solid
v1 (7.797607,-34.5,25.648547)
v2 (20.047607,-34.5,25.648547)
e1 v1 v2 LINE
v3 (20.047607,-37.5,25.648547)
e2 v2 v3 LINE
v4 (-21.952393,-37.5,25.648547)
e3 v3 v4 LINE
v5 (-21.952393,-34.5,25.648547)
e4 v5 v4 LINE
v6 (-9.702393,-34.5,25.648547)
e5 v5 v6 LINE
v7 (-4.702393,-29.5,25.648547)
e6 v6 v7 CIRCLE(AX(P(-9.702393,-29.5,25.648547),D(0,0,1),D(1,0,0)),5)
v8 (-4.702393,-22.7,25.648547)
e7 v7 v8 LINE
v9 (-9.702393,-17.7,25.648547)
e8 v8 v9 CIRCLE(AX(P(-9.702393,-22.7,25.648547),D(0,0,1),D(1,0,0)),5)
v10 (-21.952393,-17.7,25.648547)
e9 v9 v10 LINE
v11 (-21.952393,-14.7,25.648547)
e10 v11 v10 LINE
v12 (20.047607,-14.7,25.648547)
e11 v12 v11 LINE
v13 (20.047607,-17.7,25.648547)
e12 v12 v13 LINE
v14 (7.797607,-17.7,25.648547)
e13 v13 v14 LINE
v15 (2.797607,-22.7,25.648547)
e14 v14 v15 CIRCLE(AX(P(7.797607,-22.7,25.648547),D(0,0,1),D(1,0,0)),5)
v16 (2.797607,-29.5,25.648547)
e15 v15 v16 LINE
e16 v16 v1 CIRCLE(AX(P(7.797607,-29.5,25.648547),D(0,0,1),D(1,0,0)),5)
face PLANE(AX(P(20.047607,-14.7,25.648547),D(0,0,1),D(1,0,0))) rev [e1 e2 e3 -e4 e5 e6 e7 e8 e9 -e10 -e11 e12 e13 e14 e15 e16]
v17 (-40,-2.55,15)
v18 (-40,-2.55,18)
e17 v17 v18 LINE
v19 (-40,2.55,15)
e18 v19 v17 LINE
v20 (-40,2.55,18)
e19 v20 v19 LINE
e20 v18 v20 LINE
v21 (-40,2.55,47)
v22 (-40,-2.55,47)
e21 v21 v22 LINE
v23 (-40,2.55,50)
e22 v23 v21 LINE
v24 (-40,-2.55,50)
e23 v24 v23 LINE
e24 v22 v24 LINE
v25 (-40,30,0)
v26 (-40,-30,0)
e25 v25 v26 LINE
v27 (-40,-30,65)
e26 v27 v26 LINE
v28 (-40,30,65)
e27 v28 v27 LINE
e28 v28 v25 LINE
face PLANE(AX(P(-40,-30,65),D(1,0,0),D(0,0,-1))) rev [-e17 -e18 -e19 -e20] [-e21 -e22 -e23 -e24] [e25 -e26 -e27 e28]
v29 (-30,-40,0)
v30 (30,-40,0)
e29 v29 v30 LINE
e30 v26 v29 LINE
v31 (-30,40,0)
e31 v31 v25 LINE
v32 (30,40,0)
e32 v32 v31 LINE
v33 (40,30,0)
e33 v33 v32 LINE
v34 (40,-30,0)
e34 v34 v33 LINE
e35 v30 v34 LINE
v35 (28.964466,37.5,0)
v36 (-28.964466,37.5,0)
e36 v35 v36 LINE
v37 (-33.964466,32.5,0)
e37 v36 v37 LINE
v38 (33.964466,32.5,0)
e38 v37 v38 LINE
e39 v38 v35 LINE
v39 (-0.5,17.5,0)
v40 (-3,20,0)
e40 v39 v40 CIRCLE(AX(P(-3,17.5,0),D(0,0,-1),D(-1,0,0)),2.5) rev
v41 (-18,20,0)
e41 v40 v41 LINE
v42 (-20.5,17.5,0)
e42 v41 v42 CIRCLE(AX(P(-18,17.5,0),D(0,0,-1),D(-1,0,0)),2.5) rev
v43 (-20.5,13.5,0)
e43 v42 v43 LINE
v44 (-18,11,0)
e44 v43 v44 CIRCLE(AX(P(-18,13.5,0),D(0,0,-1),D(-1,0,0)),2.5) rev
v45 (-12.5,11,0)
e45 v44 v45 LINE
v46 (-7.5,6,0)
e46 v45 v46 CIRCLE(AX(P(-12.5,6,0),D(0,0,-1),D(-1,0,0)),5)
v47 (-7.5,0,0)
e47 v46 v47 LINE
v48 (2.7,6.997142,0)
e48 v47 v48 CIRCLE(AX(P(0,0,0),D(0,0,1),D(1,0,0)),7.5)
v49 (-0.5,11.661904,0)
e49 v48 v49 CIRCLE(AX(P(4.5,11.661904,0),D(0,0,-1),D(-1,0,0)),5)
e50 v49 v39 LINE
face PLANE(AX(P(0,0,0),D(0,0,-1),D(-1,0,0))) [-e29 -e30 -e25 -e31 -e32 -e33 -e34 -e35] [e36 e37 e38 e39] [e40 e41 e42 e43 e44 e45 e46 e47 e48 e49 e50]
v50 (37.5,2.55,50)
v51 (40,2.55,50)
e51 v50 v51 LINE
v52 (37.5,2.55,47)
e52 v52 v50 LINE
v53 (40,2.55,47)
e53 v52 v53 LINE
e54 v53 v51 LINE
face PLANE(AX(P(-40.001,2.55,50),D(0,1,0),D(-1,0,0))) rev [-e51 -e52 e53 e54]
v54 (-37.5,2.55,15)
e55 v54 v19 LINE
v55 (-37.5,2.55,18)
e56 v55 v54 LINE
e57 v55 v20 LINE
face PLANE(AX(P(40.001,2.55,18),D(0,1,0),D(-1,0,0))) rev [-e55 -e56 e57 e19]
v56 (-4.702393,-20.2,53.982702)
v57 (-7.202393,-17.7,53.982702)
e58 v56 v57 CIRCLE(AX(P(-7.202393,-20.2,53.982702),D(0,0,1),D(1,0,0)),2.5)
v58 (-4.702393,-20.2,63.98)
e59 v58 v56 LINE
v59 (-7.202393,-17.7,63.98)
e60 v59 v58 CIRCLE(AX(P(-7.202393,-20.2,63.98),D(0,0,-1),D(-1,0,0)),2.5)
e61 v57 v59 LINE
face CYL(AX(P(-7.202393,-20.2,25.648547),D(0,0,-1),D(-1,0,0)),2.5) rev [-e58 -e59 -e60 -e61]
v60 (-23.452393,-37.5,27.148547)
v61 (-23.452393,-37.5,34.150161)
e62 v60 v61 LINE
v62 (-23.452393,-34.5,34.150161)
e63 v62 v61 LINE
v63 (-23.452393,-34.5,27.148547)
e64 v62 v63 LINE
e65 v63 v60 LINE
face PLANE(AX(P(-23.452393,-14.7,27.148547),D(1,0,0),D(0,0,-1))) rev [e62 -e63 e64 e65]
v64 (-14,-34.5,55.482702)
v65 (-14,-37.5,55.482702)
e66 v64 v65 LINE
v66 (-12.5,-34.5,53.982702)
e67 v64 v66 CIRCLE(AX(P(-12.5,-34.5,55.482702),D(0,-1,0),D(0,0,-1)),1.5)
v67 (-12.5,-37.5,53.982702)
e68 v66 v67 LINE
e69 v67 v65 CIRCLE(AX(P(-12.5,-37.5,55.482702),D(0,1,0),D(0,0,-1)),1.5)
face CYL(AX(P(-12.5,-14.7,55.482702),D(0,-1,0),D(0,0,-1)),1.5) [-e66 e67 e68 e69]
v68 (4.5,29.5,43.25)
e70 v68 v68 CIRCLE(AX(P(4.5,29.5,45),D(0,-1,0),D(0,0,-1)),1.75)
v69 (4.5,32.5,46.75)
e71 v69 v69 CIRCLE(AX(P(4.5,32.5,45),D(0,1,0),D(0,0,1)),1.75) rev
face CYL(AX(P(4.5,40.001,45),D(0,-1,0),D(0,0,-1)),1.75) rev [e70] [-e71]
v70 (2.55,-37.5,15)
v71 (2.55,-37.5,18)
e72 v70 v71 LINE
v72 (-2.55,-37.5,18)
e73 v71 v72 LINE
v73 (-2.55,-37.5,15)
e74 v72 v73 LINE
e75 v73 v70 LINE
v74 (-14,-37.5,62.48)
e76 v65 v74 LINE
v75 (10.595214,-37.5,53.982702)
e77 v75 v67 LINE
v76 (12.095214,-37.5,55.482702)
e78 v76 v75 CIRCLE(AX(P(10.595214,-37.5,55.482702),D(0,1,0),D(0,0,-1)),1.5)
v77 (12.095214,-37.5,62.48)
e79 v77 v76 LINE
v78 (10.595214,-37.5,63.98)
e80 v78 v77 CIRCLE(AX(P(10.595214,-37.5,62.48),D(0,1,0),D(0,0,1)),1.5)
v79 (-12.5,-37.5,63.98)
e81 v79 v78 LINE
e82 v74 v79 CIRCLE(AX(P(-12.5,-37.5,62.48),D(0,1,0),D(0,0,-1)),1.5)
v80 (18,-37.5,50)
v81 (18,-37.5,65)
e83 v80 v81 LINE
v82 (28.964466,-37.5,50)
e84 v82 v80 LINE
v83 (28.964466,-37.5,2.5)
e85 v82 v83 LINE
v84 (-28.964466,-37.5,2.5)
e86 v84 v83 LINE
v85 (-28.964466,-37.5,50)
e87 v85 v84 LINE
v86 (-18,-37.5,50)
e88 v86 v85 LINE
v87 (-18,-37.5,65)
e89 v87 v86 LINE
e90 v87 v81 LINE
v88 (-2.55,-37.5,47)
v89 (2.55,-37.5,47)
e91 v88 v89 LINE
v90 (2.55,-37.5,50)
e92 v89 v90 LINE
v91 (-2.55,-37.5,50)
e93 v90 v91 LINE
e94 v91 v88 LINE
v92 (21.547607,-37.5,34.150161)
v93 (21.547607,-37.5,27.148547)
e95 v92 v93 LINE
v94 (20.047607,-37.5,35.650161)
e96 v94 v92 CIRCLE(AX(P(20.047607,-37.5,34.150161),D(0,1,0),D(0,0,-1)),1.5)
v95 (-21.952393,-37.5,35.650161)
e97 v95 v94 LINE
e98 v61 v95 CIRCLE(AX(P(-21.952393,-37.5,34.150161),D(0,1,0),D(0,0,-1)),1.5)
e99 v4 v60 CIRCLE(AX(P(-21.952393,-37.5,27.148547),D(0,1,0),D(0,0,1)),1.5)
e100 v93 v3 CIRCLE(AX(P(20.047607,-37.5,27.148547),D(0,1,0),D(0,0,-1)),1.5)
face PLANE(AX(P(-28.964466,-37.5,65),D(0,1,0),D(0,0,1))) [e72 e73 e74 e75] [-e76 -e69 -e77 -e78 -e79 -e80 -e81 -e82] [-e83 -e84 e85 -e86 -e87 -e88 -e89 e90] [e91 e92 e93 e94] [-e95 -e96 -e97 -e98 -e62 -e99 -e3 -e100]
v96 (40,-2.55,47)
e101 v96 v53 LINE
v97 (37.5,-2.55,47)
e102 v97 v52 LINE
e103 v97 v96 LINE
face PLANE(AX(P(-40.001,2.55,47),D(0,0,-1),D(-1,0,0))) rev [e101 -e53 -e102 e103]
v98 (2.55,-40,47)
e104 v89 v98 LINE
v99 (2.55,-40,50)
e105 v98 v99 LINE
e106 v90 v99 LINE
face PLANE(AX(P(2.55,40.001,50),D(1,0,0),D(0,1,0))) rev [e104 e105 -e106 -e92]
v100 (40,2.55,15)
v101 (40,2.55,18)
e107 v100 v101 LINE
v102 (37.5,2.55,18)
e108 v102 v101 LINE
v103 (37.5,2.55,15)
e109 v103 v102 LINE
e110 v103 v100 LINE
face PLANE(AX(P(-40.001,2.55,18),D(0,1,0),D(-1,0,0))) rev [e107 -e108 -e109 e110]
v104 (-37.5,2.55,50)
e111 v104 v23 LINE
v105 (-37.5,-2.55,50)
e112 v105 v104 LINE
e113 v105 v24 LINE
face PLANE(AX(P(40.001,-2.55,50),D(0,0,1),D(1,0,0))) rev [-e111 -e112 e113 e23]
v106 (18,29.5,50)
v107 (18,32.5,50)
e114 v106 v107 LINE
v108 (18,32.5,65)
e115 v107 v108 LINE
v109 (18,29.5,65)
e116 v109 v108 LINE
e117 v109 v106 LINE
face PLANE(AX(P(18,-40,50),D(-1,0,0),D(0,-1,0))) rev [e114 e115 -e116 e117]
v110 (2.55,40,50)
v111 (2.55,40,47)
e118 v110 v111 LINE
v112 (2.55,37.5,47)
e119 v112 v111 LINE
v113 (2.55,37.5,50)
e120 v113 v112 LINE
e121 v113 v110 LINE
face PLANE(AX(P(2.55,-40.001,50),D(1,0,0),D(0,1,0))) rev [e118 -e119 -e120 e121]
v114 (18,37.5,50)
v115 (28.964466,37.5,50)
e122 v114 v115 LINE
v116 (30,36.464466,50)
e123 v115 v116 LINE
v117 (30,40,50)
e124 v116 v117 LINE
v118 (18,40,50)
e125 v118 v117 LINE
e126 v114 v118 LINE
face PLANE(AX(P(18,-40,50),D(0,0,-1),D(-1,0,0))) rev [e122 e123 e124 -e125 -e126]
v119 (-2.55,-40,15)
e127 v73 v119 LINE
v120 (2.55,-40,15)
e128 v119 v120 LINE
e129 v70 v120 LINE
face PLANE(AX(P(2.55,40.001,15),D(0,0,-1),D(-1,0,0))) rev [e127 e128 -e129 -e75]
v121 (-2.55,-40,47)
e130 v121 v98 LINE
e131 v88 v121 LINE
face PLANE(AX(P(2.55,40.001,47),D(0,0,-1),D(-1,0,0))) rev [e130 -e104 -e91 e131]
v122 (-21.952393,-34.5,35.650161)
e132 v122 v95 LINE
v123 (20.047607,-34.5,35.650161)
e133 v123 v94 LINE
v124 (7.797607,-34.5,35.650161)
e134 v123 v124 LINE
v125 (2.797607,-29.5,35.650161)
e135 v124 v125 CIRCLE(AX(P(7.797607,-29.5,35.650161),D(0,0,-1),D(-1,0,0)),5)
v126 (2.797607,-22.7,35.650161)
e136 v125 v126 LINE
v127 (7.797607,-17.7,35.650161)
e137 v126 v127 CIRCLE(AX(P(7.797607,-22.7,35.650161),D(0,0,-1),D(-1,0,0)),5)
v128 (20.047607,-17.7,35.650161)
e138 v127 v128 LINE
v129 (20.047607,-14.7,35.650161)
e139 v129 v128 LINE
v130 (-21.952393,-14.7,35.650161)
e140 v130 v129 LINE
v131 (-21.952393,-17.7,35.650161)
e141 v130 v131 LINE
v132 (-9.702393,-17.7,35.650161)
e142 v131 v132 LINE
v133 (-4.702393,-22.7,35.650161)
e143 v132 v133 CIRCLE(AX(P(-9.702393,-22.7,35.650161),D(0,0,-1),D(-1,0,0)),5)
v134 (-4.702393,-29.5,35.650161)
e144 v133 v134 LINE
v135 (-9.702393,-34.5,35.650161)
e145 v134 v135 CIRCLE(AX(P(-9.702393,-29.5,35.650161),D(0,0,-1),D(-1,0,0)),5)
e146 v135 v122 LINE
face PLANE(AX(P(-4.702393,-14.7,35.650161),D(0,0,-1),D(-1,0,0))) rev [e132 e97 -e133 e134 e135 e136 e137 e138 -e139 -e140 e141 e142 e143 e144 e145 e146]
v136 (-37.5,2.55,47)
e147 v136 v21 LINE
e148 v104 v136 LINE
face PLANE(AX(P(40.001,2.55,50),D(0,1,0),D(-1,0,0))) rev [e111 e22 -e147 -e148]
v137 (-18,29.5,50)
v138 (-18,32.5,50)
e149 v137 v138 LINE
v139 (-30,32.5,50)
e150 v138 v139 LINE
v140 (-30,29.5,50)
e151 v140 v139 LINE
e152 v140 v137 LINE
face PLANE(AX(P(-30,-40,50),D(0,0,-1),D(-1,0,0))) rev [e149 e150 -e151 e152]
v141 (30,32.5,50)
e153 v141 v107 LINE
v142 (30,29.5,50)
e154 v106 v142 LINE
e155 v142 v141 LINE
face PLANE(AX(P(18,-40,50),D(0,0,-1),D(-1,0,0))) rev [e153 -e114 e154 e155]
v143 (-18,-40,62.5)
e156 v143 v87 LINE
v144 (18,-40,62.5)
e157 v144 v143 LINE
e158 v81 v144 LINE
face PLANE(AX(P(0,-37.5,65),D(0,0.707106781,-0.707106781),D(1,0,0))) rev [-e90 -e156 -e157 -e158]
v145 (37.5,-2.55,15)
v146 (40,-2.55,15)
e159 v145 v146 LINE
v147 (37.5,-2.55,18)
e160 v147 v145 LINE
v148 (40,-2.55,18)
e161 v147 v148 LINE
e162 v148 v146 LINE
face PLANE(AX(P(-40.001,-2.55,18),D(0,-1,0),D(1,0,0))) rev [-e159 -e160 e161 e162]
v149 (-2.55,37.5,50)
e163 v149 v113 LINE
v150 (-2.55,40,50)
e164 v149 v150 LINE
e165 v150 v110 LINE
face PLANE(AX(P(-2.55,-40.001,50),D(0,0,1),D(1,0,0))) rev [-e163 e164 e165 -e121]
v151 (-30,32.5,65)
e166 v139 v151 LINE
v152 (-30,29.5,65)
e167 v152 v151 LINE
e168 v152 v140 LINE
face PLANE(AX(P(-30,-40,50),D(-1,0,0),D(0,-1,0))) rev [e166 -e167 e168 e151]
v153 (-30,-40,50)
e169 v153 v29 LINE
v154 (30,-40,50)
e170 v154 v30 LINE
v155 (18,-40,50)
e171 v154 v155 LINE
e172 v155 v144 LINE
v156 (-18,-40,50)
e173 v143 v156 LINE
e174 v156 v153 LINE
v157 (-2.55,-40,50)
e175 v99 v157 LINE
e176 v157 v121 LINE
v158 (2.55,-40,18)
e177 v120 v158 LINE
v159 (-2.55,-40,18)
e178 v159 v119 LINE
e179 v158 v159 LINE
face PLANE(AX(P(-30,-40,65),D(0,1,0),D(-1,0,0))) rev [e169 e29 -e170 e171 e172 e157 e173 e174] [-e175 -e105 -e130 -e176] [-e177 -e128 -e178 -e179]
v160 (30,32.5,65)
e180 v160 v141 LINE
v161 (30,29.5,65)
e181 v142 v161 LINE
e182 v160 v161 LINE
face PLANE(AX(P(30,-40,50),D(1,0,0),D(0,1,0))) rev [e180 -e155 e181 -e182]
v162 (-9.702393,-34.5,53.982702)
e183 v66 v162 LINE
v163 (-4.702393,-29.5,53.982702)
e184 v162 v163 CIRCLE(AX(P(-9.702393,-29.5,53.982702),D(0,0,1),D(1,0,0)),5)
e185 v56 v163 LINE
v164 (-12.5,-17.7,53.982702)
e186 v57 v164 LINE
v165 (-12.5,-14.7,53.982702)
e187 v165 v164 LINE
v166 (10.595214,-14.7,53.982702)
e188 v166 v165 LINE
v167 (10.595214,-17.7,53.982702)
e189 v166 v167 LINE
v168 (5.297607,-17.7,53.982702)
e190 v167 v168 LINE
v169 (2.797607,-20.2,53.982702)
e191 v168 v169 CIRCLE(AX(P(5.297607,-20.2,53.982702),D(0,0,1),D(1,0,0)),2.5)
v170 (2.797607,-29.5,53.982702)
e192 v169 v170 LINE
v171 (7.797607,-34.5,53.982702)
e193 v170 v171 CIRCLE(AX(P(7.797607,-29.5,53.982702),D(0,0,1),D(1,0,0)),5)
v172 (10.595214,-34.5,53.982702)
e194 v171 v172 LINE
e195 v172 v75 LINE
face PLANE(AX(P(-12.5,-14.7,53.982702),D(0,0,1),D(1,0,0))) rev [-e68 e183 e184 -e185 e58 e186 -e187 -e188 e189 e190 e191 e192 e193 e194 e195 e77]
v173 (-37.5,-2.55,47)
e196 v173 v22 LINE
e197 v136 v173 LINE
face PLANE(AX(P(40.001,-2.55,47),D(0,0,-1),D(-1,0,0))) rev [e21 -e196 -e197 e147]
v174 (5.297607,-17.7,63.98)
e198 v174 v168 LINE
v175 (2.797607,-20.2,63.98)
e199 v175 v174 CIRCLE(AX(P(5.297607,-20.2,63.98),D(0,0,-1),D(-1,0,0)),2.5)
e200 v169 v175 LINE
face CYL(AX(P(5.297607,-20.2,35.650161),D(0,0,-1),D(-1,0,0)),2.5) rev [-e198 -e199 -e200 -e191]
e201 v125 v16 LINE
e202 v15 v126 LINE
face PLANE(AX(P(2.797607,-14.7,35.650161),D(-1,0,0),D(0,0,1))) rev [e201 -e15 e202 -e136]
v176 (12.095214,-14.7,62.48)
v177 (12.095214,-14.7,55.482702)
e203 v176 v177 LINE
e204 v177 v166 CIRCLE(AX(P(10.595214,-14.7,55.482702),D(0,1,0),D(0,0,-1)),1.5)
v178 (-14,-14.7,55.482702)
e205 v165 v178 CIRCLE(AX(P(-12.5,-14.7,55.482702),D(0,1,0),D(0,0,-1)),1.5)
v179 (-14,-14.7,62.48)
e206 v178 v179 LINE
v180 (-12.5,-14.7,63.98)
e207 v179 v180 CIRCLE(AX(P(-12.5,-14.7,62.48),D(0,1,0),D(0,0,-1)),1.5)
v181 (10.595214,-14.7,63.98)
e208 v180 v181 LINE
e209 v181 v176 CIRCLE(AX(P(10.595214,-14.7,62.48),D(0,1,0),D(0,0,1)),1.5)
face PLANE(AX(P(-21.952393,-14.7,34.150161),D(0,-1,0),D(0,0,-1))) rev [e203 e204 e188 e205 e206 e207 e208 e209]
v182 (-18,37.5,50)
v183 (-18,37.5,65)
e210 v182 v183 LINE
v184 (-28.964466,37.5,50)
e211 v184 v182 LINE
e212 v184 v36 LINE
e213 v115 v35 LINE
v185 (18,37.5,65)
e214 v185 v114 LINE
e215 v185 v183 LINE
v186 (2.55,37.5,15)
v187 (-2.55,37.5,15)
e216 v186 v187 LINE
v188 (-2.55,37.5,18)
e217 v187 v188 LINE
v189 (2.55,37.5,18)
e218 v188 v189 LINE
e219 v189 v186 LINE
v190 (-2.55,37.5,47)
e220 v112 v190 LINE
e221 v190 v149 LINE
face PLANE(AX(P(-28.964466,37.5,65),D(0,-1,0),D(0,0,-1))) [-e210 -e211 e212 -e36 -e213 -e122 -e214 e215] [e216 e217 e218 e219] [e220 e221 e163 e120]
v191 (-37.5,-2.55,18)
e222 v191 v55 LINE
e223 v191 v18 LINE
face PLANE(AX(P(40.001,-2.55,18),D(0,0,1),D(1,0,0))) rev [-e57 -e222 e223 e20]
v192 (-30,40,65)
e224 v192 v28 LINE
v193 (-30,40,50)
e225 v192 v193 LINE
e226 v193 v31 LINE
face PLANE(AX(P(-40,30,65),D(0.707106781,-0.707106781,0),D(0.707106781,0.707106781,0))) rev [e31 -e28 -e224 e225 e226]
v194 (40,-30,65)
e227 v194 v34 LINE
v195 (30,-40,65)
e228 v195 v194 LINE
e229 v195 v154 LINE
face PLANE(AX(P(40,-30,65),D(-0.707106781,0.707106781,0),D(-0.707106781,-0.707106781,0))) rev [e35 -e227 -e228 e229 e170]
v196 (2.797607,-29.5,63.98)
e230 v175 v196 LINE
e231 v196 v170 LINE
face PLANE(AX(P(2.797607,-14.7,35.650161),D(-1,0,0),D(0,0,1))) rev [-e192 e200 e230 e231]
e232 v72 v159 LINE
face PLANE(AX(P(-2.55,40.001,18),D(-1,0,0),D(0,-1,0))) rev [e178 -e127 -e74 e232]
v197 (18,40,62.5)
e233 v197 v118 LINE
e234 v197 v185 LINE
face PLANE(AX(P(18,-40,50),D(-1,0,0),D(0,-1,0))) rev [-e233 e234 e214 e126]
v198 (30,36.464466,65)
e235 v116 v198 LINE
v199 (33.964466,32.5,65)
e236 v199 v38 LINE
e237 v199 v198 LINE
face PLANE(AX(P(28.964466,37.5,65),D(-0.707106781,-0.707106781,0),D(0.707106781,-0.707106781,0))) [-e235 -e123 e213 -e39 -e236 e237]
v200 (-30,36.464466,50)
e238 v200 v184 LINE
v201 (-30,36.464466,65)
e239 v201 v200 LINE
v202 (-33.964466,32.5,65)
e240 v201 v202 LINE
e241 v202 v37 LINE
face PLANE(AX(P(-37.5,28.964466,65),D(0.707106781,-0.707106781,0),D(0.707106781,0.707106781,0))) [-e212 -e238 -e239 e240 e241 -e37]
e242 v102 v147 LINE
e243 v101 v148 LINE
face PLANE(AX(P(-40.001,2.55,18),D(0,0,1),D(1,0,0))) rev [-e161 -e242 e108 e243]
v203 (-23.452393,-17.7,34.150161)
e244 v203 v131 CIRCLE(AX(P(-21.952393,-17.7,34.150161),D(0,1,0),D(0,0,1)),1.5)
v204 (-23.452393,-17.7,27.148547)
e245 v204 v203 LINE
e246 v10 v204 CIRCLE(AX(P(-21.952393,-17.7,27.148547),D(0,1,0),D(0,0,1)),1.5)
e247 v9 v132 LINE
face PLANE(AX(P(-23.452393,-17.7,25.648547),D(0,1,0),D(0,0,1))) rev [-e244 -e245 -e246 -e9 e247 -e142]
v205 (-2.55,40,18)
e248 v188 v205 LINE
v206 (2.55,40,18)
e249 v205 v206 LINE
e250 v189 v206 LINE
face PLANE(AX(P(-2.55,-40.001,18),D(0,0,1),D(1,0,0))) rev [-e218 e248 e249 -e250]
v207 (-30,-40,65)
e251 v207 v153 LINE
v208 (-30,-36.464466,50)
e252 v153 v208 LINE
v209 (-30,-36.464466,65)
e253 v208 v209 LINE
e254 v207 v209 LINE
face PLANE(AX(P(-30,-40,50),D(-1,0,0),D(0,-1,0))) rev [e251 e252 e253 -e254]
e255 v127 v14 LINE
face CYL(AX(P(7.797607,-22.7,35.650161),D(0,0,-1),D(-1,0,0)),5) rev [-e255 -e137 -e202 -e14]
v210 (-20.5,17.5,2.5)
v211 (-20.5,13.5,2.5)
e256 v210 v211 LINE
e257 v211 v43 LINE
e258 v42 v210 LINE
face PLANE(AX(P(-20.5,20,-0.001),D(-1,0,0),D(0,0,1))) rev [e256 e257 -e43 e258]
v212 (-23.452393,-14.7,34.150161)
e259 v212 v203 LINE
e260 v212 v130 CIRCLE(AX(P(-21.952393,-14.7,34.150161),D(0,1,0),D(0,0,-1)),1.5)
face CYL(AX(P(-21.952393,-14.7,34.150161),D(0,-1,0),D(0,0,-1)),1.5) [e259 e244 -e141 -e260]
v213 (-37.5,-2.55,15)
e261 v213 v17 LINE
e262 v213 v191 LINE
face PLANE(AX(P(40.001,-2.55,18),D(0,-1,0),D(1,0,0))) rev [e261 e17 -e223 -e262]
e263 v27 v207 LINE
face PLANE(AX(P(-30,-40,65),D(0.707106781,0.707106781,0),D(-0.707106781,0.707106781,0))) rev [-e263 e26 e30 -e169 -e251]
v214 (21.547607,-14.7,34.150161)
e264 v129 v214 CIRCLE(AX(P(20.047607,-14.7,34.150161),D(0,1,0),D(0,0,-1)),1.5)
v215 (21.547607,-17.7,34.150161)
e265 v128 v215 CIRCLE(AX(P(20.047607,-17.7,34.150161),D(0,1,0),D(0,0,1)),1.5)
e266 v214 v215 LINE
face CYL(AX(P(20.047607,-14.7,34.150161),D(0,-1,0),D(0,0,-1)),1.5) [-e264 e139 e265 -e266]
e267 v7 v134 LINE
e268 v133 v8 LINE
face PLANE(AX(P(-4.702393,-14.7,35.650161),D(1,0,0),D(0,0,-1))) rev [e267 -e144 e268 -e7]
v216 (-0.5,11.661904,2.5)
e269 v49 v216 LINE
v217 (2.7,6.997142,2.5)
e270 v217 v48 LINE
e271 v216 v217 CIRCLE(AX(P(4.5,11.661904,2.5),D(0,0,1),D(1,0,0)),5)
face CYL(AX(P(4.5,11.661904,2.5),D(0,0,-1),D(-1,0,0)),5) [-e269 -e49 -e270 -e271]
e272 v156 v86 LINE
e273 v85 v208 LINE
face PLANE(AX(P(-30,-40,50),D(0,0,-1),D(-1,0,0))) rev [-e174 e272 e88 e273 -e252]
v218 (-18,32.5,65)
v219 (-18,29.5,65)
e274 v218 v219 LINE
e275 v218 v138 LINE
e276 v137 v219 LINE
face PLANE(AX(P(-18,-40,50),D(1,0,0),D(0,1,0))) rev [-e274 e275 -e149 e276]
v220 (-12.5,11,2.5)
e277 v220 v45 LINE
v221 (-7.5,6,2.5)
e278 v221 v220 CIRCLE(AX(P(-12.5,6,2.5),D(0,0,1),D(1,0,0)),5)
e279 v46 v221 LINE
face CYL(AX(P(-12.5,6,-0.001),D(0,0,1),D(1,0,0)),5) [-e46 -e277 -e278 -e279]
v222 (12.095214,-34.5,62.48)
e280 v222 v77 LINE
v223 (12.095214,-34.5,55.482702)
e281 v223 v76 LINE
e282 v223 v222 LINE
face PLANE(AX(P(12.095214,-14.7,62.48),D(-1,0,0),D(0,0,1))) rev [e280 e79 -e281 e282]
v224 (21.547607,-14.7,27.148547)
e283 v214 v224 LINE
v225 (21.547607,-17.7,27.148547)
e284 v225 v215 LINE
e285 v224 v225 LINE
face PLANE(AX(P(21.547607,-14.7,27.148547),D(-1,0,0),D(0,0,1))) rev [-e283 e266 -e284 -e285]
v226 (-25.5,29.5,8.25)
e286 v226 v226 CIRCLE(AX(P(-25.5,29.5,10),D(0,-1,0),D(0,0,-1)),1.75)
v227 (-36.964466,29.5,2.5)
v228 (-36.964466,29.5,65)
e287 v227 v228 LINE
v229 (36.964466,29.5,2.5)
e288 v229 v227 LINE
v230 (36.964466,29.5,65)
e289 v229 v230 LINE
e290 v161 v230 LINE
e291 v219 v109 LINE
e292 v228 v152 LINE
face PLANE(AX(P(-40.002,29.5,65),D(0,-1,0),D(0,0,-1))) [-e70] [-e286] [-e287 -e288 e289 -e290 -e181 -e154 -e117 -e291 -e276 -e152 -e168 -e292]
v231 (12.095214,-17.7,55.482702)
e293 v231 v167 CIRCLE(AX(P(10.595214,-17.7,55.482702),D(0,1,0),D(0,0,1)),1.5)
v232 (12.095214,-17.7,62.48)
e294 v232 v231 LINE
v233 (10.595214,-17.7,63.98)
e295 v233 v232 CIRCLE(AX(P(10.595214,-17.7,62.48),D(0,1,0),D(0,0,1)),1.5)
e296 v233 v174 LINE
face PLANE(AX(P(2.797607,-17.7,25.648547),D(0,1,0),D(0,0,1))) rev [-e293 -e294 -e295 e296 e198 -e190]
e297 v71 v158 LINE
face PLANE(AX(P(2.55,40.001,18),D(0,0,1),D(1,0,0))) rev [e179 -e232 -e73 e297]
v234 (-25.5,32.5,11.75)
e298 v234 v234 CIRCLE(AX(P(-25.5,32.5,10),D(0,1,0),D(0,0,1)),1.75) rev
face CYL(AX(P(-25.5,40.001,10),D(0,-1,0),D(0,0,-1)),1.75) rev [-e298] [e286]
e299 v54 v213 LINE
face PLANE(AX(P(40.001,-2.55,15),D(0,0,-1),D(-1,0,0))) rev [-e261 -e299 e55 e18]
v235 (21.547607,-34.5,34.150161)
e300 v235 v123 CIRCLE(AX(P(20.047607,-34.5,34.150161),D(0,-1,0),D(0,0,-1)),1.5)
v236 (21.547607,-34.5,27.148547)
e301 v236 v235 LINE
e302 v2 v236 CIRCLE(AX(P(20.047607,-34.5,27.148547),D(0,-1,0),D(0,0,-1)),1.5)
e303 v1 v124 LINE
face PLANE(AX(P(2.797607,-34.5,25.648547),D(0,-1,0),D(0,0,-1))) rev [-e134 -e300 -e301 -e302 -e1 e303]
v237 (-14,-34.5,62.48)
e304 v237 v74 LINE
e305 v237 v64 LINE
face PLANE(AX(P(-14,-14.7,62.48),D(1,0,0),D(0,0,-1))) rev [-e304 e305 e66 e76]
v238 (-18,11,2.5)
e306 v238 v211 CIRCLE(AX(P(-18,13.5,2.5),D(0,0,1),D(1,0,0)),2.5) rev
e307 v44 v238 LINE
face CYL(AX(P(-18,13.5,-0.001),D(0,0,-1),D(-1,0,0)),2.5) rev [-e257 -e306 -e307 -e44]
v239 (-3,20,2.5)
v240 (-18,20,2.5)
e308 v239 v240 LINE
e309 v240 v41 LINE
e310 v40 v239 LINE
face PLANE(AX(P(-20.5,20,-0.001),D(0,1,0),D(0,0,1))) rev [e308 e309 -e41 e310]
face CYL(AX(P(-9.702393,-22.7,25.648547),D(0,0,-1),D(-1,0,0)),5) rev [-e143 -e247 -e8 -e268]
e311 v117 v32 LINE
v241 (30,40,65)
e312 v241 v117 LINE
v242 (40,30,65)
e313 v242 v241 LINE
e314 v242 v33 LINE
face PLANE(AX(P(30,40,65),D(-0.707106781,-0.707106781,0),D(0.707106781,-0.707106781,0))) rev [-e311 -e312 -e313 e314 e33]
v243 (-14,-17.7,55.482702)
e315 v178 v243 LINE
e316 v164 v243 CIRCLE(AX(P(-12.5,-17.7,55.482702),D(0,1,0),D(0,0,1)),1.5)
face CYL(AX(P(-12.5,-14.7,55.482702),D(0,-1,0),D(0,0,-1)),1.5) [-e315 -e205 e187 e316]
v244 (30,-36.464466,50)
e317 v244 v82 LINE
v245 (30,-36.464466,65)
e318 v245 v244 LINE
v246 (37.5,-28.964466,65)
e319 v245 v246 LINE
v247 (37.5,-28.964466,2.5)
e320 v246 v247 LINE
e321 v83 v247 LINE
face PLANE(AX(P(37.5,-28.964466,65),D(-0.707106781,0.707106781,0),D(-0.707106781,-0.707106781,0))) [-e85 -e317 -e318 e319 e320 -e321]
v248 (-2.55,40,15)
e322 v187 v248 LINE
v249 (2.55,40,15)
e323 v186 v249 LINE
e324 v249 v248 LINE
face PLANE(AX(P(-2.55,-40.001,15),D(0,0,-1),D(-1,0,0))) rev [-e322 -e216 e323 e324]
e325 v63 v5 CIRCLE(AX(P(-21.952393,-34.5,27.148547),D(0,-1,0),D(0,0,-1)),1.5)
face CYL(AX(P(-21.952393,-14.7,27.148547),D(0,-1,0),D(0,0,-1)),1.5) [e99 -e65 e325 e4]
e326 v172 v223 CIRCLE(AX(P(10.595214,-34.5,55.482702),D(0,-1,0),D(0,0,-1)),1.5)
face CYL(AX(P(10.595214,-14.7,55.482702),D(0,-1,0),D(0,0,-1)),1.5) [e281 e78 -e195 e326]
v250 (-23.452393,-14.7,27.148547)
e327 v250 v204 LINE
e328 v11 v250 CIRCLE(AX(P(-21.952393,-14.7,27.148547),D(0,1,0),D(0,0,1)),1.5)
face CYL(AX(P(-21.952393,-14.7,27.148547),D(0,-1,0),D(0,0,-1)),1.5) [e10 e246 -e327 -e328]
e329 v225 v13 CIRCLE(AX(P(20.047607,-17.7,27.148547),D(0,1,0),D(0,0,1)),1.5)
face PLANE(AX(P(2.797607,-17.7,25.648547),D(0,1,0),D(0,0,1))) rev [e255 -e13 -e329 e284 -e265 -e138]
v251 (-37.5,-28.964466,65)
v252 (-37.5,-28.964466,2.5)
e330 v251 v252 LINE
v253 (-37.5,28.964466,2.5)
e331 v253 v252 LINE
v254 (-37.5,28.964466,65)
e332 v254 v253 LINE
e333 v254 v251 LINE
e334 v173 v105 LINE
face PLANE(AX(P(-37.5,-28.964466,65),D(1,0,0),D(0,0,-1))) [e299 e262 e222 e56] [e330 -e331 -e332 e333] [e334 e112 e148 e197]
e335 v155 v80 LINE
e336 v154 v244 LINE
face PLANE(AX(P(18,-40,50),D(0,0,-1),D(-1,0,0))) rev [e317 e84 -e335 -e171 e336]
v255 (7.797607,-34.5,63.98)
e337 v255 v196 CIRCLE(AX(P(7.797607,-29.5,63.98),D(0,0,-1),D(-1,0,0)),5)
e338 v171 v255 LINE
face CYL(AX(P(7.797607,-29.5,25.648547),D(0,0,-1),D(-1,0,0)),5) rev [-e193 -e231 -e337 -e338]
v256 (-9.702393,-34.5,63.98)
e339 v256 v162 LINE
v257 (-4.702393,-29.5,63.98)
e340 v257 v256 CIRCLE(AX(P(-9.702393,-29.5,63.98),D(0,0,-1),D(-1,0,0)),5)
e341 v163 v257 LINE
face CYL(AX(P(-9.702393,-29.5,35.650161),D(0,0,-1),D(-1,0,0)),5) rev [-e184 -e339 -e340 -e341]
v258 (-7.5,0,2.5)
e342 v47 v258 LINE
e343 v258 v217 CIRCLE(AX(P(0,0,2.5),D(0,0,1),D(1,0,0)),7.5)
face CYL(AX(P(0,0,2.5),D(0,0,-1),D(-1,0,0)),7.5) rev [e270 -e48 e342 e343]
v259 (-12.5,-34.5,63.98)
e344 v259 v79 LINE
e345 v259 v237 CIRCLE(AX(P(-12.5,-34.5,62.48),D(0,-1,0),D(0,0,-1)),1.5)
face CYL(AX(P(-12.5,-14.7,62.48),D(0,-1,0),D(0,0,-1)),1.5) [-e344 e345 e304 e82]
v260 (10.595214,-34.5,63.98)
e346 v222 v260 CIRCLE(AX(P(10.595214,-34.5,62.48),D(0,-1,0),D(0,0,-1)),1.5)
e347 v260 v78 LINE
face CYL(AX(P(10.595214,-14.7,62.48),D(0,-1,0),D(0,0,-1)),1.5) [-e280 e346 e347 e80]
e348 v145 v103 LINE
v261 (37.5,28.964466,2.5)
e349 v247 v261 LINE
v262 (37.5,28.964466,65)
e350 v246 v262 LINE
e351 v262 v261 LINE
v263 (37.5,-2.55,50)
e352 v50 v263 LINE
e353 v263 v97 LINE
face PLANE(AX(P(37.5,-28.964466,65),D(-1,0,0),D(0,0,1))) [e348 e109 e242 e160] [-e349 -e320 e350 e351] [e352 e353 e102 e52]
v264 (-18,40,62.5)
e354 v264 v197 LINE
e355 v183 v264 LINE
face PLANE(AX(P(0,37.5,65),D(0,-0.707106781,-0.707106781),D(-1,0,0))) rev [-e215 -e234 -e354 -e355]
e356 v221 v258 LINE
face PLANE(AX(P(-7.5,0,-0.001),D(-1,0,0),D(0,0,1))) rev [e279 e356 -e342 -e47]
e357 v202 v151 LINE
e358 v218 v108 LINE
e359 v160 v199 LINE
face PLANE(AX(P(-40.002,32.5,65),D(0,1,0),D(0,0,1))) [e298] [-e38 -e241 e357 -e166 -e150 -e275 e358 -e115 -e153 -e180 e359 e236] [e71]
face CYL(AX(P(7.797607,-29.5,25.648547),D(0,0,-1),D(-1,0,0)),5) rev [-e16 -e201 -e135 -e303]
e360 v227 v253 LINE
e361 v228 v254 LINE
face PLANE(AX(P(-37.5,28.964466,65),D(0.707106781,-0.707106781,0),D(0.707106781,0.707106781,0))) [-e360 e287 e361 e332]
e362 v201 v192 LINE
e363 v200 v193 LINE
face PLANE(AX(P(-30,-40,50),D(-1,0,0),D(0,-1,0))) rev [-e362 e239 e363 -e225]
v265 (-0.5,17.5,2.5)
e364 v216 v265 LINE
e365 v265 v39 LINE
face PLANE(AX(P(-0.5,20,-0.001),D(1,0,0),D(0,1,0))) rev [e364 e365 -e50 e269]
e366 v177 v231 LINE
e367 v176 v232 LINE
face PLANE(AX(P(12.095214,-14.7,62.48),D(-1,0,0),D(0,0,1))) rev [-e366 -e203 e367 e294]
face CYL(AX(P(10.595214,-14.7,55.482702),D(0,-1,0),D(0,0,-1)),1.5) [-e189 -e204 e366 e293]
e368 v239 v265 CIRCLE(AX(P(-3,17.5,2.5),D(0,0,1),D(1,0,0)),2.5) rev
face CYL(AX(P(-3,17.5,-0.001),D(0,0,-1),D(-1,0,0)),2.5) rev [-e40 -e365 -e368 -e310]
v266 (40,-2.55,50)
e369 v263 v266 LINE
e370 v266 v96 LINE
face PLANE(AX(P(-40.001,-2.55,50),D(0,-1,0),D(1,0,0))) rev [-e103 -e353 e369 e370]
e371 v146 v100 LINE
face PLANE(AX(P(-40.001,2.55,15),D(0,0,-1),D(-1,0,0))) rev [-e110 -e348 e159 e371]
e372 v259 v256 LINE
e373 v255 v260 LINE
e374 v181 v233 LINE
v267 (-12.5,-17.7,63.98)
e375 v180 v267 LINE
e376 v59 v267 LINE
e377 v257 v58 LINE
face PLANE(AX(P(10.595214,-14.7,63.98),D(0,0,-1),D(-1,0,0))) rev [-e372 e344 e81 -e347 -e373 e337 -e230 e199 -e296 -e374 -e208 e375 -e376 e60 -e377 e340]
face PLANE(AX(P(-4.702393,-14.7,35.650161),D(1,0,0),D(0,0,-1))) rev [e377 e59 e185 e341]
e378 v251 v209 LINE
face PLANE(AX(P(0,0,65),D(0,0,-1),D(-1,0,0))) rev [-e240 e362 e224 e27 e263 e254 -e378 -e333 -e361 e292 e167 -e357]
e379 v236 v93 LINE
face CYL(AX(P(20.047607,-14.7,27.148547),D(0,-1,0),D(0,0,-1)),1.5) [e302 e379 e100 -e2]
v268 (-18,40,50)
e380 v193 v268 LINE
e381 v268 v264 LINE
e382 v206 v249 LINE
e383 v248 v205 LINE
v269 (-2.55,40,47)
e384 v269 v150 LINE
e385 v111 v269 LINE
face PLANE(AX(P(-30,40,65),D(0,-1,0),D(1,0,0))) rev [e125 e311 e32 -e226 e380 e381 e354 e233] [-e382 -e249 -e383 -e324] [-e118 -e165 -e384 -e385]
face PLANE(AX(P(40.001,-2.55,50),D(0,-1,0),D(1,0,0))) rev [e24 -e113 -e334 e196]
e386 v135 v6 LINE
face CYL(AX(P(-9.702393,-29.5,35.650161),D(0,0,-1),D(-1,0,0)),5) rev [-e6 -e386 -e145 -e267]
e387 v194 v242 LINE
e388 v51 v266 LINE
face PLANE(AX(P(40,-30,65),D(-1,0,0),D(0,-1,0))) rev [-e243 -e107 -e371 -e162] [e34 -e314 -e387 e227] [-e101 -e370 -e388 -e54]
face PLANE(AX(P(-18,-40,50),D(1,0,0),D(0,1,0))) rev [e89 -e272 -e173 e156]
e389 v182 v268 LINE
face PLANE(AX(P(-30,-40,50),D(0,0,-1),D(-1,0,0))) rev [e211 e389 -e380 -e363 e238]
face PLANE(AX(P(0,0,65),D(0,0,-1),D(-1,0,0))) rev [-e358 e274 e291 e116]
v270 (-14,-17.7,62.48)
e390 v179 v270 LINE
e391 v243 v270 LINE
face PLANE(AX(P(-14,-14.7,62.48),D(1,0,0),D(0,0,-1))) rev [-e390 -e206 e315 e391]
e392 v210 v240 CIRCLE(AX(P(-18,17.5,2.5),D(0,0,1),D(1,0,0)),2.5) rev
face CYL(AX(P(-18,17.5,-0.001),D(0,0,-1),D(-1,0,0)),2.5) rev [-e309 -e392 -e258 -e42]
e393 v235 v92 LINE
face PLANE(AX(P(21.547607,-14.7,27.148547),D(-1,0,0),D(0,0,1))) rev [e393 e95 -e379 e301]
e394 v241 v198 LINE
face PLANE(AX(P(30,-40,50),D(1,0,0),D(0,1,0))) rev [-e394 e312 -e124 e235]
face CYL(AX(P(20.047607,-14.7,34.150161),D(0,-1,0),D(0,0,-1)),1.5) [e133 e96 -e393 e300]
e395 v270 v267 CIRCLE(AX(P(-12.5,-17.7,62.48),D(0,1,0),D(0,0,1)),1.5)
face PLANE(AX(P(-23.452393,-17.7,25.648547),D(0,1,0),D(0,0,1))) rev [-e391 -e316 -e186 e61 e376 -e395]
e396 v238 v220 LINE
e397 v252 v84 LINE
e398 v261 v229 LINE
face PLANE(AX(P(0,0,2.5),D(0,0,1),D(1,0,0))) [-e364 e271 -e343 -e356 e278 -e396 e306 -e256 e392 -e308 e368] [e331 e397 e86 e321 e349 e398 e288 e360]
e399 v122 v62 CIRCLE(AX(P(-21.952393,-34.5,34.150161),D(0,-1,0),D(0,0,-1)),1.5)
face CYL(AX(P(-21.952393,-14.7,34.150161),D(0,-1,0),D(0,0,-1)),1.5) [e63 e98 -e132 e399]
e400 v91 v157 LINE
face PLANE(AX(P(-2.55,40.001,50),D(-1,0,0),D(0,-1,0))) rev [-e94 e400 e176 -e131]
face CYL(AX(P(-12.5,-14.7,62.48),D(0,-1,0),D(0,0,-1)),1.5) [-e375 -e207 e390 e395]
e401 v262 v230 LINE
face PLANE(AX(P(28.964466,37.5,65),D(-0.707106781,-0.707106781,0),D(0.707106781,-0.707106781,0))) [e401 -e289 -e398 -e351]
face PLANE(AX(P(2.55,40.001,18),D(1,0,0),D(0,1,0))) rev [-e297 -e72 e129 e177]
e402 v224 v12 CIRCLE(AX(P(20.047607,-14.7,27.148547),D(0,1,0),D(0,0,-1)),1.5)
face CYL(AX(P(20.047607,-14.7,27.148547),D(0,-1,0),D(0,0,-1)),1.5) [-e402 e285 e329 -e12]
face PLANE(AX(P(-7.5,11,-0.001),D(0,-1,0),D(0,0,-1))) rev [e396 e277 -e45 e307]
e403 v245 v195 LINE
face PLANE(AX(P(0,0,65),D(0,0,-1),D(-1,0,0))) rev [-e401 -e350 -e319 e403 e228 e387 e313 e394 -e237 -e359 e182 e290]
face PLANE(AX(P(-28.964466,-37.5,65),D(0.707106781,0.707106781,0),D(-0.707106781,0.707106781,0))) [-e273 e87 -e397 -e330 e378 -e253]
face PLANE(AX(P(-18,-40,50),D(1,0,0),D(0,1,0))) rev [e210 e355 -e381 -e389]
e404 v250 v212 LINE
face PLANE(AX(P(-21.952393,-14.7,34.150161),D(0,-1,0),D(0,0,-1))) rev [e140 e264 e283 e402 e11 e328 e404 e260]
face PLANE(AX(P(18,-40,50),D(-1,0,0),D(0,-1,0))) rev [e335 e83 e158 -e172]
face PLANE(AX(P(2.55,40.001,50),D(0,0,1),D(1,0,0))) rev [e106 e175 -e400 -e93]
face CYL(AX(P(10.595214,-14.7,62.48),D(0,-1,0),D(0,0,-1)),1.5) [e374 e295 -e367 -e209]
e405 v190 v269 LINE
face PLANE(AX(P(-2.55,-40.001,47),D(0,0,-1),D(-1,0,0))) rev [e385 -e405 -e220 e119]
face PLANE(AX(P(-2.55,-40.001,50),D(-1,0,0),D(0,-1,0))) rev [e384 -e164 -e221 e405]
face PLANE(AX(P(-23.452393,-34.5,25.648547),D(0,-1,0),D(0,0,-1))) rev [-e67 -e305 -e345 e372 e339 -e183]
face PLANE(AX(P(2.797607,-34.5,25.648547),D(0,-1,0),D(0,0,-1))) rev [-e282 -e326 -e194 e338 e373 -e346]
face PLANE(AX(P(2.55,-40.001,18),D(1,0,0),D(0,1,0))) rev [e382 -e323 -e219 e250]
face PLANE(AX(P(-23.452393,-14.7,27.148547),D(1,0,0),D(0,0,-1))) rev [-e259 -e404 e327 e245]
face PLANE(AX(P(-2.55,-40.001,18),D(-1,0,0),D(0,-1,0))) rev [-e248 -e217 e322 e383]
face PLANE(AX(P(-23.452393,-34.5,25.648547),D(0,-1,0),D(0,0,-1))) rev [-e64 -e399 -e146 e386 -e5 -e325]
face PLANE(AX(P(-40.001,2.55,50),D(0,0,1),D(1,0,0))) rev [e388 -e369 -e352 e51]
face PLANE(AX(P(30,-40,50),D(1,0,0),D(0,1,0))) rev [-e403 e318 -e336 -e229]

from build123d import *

# Parameters (mm, degrees)
BOSS_EXTRUDE1_DEPTH             = 65
SKETCH2_R                       = 7.5
BOSS_EXTRUDE2_DEPTH             = 2.5
BOSS_EXTRUDE3_REACH             = 88.168
SKETCH3_W                       = 65
SKETCH3_H                       = 3
BOSS_EXTRUDE3_DIRECTION_2_REACH = 88.168
CUT_EXTRUDE2_REACH              = 124.042
SKETCH6_R                       = 1.75
CUT_EXTRUDE3_REACH              = 86.299
CUT_EXTRUDE4_REACH              = 86.299
FILLET1_R                       = 2.5
FILLET2_R                       = 5
CUT_EXTRUDE5_DEPTH              = 111.566722046
CUT_EXTRUDE5_DEPTH_BACK         = 111.566722046
SKETCH9_W                       = 12
SKETCH9_H                       = 32.949220019
SKETCH9_H_2                     = 17.949220019
BOSS_EXTRUDE5_DEPTH             = 22.8
SKETCH11_W                      = 18.75
SKETCH11_H                      = 16.8
CUT_EXTRUDE6_DEPTH              = 61.48
CHAMFER1_SIZE                   = 2.5
FILLET3_R                       = 5
FILLET4_R                       = 2.5
CUT_EXTRUDE8_REACH              = 112.567
SKETCH14_W                      = 3
SKETCH14_H                      = 5.1
CIRPATTERN1_START               = -40
CIRPATTERN1_OUTLINE_W           = 5.1
CIRPATTERN1_OUTLINE_H           = 3
CIRPATTERN1_DEPTH               = 25.3
CIRPATTERN1_START_2             = -2.55
CIRPATTERN1_2_OUTLINE_W         = 2.5
CIRPATTERN1_2_OUTLINE_H         = 3
CIRPATTERN1_2_DEPTH             = 5.1
CIRPATTERN1_START_3             = 37.5
CIRPATTERN1_3_OUTLINE_W         = 5.1
CIRPATTERN1_3_OUTLINE_H         = 3
CIRPATTERN1_3_DEPTH             = 2.5
CUT_EXTRUDE9_REACH              = 89.502
SKETCH15_W                      = 18.33254108
SKETCH15_H                      = 22.8


# Read off the part's stored shape, not the designer's step: CirPattern1
with BuildPart() as part:
    # Sketch1 → Boss-Extrude1 (new body)
    with BuildSketch(Plane.XY):
        Polygon((-40, 30), (-30, 40), (30, 40), (40, 30), (40, -30), (30, -40), (-30, -40), (-40, -30), align=None)
        Polygon((-37.5, 28.964466094), (-28.964466094, 37.5), (28.964466094, 37.5), (37.5, 28.964466094), (37.5, -28.964466094), (28.964466094, -37.5), (-28.964466094, -37.5), (-37.5, -28.964466094), align=None, mode=Mode.SUBTRACT)
    extrude(amount=BOSS_EXTRUDE1_DEPTH)

    # Sketch2 → Boss-Extrude2 (add)
    with BuildSketch(Plane.XY):
        Polygon((37.5, 28.964466094), (28.964466094, 37.5), (-28.964466094, 37.5), (-37.5, 28.964466094), (-37.5, -28.964466094), (-28.964466094, -37.5), (28.964466094, -37.5), (37.5, -28.964466094), align=None)
        Circle(SKETCH2_R, mode=Mode.SUBTRACT)
    extrude(amount=BOSS_EXTRUDE2_DEPTH)

    # Boss-Extrude3: up to this plane
    boss_extrude3_end = Plane(origin=(28.964466094, 37.5, 65), z_dir=(-0.7071067811865476, -0.7071067811865476, 0))
    # Sketch3 → Boss-Extrude3 (add, up to the surface)
    with BuildSketch(Plane(origin=(0, 0, 0), x_dir=(0, 0, -1), z_dir=(1, 0, 0)), mode=Mode.PRIVATE) as boss_extrude3_sk1:
        with Locations((-32.5, 31)):
            Rectangle(SKETCH3_W, SKETCH3_H)
    boss_extrude3_tool1 = split(extrude(boss_extrude3_sk1.sketch, amount=BOSS_EXTRUDE3_REACH, mode=Mode.PRIVATE), bisect_by=boss_extrude3_end, keep=Keep.BOTH, mode=Mode.PRIVATE)
    add(boss_extrude3_tool1.solids().sort_by_distance((0, 31, 32.5))[0])

    # Boss-Extrude3 direction 2: up to this plane
    boss_extrude3_direction_2_end = Plane(origin=(-37.5, 28.964466094, 65), z_dir=(0.707106781186547, -0.7071067811865481, 0))
    # Sketch3 → Boss-Extrude3 direction 2 (add, up to the surface)
    with BuildSketch(Plane(origin=(0, 0, 0), x_dir=(0, 0, -1), z_dir=(1, 0, 0)), mode=Mode.PRIVATE) as boss_extrude3_direction_2_sk1:
        with Locations((-32.5, 31)):
            Rectangle(SKETCH3_W, SKETCH3_H)
    boss_extrude3_direction_2_tool1 = split(extrude(boss_extrude3_direction_2_sk1.sketch, amount=-BOSS_EXTRUDE3_DIRECTION_2_REACH, mode=Mode.PRIVATE), bisect_by=boss_extrude3_direction_2_end, keep=Keep.BOTH, mode=Mode.PRIVATE)
    add(boss_extrude3_direction_2_tool1.solids().sort_by_distance((0, 31, 32.5))[0])

    # Sketch6 → Cut-Extrude2 (cut, up to next)
    with BuildSketch(Plane(origin=(0, 29.5, -27), x_dir=(-1, 0, 0), z_dir=(0, -1, 0)), mode=Mode.PRIVATE) as cut_extrude2_sk1:
        with Locations(Location((-4.5, -72, 0), (0, 0, 90))):
            Circle(SKETCH6_R)
    cut_extrude2_tool1 = extrude(cut_extrude2_sk1.sketch, amount=-CUT_EXTRUDE2_REACH, mode=Mode.PRIVATE) & part.part
    # Sketch6 → Cut-Extrude2 (cut, up to next)
    with BuildSketch(Plane(origin=(0, 29.5, -27), x_dir=(-1, 0, 0), z_dir=(0, -1, 0)), mode=Mode.PRIVATE) as cut_extrude2_sk2:
        with Locations(Location((25.5, -37, 0), (0, 0, 90))):
            Circle(SKETCH6_R)
    cut_extrude2_tool2 = extrude(cut_extrude2_sk2.sketch, amount=-CUT_EXTRUDE2_REACH, mode=Mode.PRIVATE) & part.part
    add(cut_extrude2_tool1.solids().sort_by_distance((4.5, 29.5, 45))[0], mode=Mode.SUBTRACT)
    add(cut_extrude2_tool2.solids().sort_by_distance((-25.5, 29.5, 10))[0], mode=Mode.SUBTRACT)

    # Sketch7 → Cut-Extrude3 (cut, up to next)
    with BuildSketch(Plane.XY.offset(2.5), mode=Mode.PRIVATE) as cut_extrude3_sk1:
        Polygon((-33.964466094, 32.5), (-28.964466094, 37.5), (28.964466094, 37.5), (33.964466094, 32.5), align=None)
    cut_extrude3_tool1 = extrude(cut_extrude3_sk1.sketch, amount=-CUT_EXTRUDE3_REACH, mode=Mode.PRIVATE) & part.part
    add(cut_extrude3_tool1.solids().sort_by_distance((0, 34.933788, 2.5))[0], mode=Mode.SUBTRACT)

    # Sketch8 → Cut-Extrude4 (cut, up to next)
    with BuildSketch(Plane.XY.offset(2.5), mode=Mode.PRIVATE) as cut_extrude4_sk1:
        Polygon((-7.5, 0), (-7.5, 11), (-10.5, 11), (-20.5, 11), (-20.5, 20), (-0.5, 20), (-0.5, 7.5), (0, 7.5), align=None)
    cut_extrude4_tool1 = extrude(cut_extrude4_sk1.sketch, amount=-CUT_EXTRUDE4_REACH, mode=Mode.PRIVATE) & part.part
    add(cut_extrude4_tool1.solids().sort_by_distance((-9.150457, 13.572273, 2.5))[0], mode=Mode.SUBTRACT)

    # Fillet1
    fillet1_edges = [part.edges().sort_by_distance(p)[0] for p in [
        (-20.5, 11, 1.25),
        (-20.5, 20, 1.25),
        (-0.5, 20, 1.25),
    ]]
    fillet(fillet1_edges, radius=FILLET1_R)

    # Fillet2
    fillet2_edges = [part.edges().sort_by_distance(p)[0] for p in [
        (-0.5, 7.5, 1.25),
        (-7.5, 11, 1.25),
    ]]
    fillet(fillet2_edges, radius=FILLET2_R)

    # Sketch9 → Cut-Extrude5 (cut, two sides: drawn at the far end of the back side and taken through both)
    with BuildSketch(Plane(origin=(0, 40, 0), x_dir=(1, 0, 0), z_dir=(0, 1, 0)).offset(-CUT_EXTRUDE5_DEPTH_BACK)):
        with Locations((24, -66.474610009)):
            Rectangle(SKETCH9_W, SKETCH9_H)
        with Locations((-24, -58.97461001)):
            Rectangle(SKETCH9_W, SKETCH9_H_2)
    extrude(amount=CUT_EXTRUDE5_DEPTH + CUT_EXTRUDE5_DEPTH_BACK, mode=Mode.SUBTRACT)

    # Sketch10 → Boss-Extrude5 (add)
    with BuildSketch(Plane(origin=(0, -37.5, 0), x_dir=(1, 0, 0), z_dir=(0, 1, 0))):
        with BuildLine():
            Line((-4.70239318, -35.65016071), (-21.95239318, -35.65016071))
            ThreePointArc((-21.95239318, -35.65016071), (-23.013053352, -35.210820882), (-23.45239318, -34.15016071))
            Line((-23.45239318, -34.15016071), (-23.45239318, -27.14854667))
            ThreePointArc((-23.45239318, -27.14854667), (-23.013053352, -26.087886498), (-21.95239318, -25.64854667))
            Line((-21.95239318, -25.64854667), (20.04760682, -25.64854667))
            ThreePointArc((20.04760682, -25.64854667), (21.108266992, -26.087886498), (21.54760682, -27.14854667))
            Line((21.54760682, -27.14854667), (21.54760682, -34.15016071))
            ThreePointArc((21.54760682, -34.15016071), (21.108266992, -35.210820882), (20.04760682, -35.65016071))
            Line((20.04760682, -35.65016071), (2.79760682, -35.65016071))
            Line((2.79760682, -35.65016071), (2.79760682, -53.98270179))
            Line((2.79760682, -53.98270179), (10.59521364, -53.98270179))
            ThreePointArc((10.59521364, -53.98270179), (11.655873812, -54.422041618), (12.09521364, -55.48270179))
            Line((12.09521364, -55.48270179), (12.09521364, -62.48))
            ThreePointArc((12.09521364, -62.48), (11.655873812, -63.540660172), (10.59521364, -63.98))
            Line((10.59521364, -63.98), (-12.5, -63.98))
            ThreePointArc((-12.5, -63.98), (-13.560660172, -63.540660172), (-14, -62.48))
            Line((-14, -62.48), (-14, -55.48270179))
            ThreePointArc((-14, -55.48270179), (-13.560660172, -54.422041618), (-12.5, -53.98270179))
            Line((-12.5, -53.98270179), (-4.70239318, -53.98270179))
            Line((-4.70239318, -53.98270179), (-4.70239318, -35.65016071))
        make_face()
    extrude(amount=BOSS_EXTRUDE5_DEPTH)

    # Sketch11 → Cut-Extrude6 (cut)
    with BuildSketch(Plane.XY.offset(63.98)):
        with Locations((-14.07739318, -26.1)):
            Rectangle(SKETCH11_W, SKETCH11_H)
        with Locations((12.17260682, -26.1)):
            Rectangle(SKETCH11_W, SKETCH11_H)
    extrude(amount=-CUT_EXTRUDE6_DEPTH, mode=Mode.SUBTRACT)

    # Chamfer1
    chamfer1_edges = [part.edges().sort_by_distance(p)[0] for p in [
        (0, 40, 65),
        (0, -40, 65),
    ]]
    chamfer(chamfer1_edges, length=CHAMFER1_SIZE - 0.0001)  # a hair under: the kernel refuses the full size

    # Fillet3
    fillet3_edges = [part.edges().sort_by_distance(p)[0] for p in [
        (-4.70239318, -17.7, 30.64935369),
        (-4.70239318, -34.5, 30.64935369),
        (-4.70239318, -34.5, 58.981350895),
        (2.79760682, -34.5, 58.981350895),
        (2.79760682, -34.5, 30.64935369),
        (2.79760682, -17.7, 30.64935369),
    ]]
    fillet(fillet3_edges, radius=FILLET3_R)

    # Fillet4
    fillet4_edges = [part.edges().sort_by_distance(p)[0] for p in [
        (-4.70239318, -17.7, 58.981350895),
        (2.79760682, -17.7, 58.981350895),
    ]]
    fillet(fillet4_edges, radius=FILLET4_R)

    # Sketch14 → Cut-Extrude8 (cut, up to next)
    with BuildSketch(Plane(origin=(40, 0, 0), x_dir=(0, 0, -1), z_dir=(1, 0, 0)), mode=Mode.PRIVATE) as cut_extrude8_sk1:
        with Locations((-48.5, 0)):
            Rectangle(SKETCH14_W, SKETCH14_H)
    cut_extrude8_tool1 = extrude(cut_extrude8_sk1.sketch, amount=-CUT_EXTRUDE8_REACH, mode=Mode.PRIVATE) & part.part
    # Sketch14 → Cut-Extrude8 (cut, up to next)
    with BuildSketch(Plane(origin=(40, 0, 0), x_dir=(0, 0, -1), z_dir=(1, 0, 0)), mode=Mode.PRIVATE) as cut_extrude8_sk2:
        with Locations((-16.5, 0)):
            Rectangle(SKETCH14_W, SKETCH14_H)
    cut_extrude8_tool2 = extrude(cut_extrude8_sk2.sketch, amount=-CUT_EXTRUDE8_REACH, mode=Mode.PRIVATE) & part.part
    add(cut_extrude8_tool1.solids().sort_by_distance((40, 0, 48.5))[0], mode=Mode.SUBTRACT)
    add(cut_extrude8_tool2.solids().sort_by_distance((40, 0, 16.5))[0], mode=Mode.SUBTRACT)

    # CirPattern1 outline → CirPattern1 (cut)
    with BuildSketch(Plane(origin=(0, 0, 0), x_dir=(1, 0, 0), z_dir=(0, 1, 0)).offset(CIRPATTERN1_START)):
        with Locations((0, -16.5)):
            Rectangle(CIRPATTERN1_OUTLINE_W, CIRPATTERN1_OUTLINE_H)
        with Locations((0, -48.5)):
            Rectangle(CIRPATTERN1_OUTLINE_W, CIRPATTERN1_OUTLINE_H)
    extrude(amount=CIRPATTERN1_DEPTH, mode=Mode.SUBTRACT)

    # CirPattern1 2 outline → CirPattern1 2 (cut)
    with BuildSketch(Plane(origin=(0, 0, 0), x_dir=(1, 0, 0), z_dir=(0, 1, 0)).offset(CIRPATTERN1_START_2)):
        with Locations((-38.75, -16.5)):
            Rectangle(CIRPATTERN1_2_OUTLINE_W, CIRPATTERN1_2_OUTLINE_H)
        with Locations((-38.75, -48.5)):
            Rectangle(CIRPATTERN1_2_OUTLINE_W, CIRPATTERN1_2_OUTLINE_H)
    extrude(amount=CIRPATTERN1_2_DEPTH, mode=Mode.SUBTRACT)

    # CirPattern1 3 outline → CirPattern1 3 (cut)
    with BuildSketch(Plane(origin=(0, 0, 0), x_dir=(1, 0, 0), z_dir=(0, 1, 0)).offset(CIRPATTERN1_START_3)):
        with Locations((0, -16.5)):
            Rectangle(CIRPATTERN1_3_OUTLINE_W, CIRPATTERN1_3_OUTLINE_H)
        with Locations((0, -48.5)):
            Rectangle(CIRPATTERN1_3_OUTLINE_W, CIRPATTERN1_3_OUTLINE_H)
    extrude(amount=CIRPATTERN1_3_DEPTH, mode=Mode.SUBTRACT)

    # Sketch15 → Cut-Extrude9 (cut, up to next)
    with BuildSketch(Plane(origin=(2.79760682, 0, 0), x_dir=(0, 0, -1), z_dir=(1, 0, 0)), mode=Mode.PRIVATE) as cut_extrude9_sk1:
        with Locations((-44.81643125, -26.1)):
            Rectangle(SKETCH15_W, SKETCH15_H)
    cut_extrude9_tool1 = extrude(cut_extrude9_sk1.sketch, amount=-CUT_EXTRUDE9_REACH, mode=Mode.PRIVATE) & part.part
    add(cut_extrude9_tool1.solids().sort_by_distance((2.797607, -26.1, 44.816431))[0], mode=Mode.SUBTRACT)


solid = part.part
